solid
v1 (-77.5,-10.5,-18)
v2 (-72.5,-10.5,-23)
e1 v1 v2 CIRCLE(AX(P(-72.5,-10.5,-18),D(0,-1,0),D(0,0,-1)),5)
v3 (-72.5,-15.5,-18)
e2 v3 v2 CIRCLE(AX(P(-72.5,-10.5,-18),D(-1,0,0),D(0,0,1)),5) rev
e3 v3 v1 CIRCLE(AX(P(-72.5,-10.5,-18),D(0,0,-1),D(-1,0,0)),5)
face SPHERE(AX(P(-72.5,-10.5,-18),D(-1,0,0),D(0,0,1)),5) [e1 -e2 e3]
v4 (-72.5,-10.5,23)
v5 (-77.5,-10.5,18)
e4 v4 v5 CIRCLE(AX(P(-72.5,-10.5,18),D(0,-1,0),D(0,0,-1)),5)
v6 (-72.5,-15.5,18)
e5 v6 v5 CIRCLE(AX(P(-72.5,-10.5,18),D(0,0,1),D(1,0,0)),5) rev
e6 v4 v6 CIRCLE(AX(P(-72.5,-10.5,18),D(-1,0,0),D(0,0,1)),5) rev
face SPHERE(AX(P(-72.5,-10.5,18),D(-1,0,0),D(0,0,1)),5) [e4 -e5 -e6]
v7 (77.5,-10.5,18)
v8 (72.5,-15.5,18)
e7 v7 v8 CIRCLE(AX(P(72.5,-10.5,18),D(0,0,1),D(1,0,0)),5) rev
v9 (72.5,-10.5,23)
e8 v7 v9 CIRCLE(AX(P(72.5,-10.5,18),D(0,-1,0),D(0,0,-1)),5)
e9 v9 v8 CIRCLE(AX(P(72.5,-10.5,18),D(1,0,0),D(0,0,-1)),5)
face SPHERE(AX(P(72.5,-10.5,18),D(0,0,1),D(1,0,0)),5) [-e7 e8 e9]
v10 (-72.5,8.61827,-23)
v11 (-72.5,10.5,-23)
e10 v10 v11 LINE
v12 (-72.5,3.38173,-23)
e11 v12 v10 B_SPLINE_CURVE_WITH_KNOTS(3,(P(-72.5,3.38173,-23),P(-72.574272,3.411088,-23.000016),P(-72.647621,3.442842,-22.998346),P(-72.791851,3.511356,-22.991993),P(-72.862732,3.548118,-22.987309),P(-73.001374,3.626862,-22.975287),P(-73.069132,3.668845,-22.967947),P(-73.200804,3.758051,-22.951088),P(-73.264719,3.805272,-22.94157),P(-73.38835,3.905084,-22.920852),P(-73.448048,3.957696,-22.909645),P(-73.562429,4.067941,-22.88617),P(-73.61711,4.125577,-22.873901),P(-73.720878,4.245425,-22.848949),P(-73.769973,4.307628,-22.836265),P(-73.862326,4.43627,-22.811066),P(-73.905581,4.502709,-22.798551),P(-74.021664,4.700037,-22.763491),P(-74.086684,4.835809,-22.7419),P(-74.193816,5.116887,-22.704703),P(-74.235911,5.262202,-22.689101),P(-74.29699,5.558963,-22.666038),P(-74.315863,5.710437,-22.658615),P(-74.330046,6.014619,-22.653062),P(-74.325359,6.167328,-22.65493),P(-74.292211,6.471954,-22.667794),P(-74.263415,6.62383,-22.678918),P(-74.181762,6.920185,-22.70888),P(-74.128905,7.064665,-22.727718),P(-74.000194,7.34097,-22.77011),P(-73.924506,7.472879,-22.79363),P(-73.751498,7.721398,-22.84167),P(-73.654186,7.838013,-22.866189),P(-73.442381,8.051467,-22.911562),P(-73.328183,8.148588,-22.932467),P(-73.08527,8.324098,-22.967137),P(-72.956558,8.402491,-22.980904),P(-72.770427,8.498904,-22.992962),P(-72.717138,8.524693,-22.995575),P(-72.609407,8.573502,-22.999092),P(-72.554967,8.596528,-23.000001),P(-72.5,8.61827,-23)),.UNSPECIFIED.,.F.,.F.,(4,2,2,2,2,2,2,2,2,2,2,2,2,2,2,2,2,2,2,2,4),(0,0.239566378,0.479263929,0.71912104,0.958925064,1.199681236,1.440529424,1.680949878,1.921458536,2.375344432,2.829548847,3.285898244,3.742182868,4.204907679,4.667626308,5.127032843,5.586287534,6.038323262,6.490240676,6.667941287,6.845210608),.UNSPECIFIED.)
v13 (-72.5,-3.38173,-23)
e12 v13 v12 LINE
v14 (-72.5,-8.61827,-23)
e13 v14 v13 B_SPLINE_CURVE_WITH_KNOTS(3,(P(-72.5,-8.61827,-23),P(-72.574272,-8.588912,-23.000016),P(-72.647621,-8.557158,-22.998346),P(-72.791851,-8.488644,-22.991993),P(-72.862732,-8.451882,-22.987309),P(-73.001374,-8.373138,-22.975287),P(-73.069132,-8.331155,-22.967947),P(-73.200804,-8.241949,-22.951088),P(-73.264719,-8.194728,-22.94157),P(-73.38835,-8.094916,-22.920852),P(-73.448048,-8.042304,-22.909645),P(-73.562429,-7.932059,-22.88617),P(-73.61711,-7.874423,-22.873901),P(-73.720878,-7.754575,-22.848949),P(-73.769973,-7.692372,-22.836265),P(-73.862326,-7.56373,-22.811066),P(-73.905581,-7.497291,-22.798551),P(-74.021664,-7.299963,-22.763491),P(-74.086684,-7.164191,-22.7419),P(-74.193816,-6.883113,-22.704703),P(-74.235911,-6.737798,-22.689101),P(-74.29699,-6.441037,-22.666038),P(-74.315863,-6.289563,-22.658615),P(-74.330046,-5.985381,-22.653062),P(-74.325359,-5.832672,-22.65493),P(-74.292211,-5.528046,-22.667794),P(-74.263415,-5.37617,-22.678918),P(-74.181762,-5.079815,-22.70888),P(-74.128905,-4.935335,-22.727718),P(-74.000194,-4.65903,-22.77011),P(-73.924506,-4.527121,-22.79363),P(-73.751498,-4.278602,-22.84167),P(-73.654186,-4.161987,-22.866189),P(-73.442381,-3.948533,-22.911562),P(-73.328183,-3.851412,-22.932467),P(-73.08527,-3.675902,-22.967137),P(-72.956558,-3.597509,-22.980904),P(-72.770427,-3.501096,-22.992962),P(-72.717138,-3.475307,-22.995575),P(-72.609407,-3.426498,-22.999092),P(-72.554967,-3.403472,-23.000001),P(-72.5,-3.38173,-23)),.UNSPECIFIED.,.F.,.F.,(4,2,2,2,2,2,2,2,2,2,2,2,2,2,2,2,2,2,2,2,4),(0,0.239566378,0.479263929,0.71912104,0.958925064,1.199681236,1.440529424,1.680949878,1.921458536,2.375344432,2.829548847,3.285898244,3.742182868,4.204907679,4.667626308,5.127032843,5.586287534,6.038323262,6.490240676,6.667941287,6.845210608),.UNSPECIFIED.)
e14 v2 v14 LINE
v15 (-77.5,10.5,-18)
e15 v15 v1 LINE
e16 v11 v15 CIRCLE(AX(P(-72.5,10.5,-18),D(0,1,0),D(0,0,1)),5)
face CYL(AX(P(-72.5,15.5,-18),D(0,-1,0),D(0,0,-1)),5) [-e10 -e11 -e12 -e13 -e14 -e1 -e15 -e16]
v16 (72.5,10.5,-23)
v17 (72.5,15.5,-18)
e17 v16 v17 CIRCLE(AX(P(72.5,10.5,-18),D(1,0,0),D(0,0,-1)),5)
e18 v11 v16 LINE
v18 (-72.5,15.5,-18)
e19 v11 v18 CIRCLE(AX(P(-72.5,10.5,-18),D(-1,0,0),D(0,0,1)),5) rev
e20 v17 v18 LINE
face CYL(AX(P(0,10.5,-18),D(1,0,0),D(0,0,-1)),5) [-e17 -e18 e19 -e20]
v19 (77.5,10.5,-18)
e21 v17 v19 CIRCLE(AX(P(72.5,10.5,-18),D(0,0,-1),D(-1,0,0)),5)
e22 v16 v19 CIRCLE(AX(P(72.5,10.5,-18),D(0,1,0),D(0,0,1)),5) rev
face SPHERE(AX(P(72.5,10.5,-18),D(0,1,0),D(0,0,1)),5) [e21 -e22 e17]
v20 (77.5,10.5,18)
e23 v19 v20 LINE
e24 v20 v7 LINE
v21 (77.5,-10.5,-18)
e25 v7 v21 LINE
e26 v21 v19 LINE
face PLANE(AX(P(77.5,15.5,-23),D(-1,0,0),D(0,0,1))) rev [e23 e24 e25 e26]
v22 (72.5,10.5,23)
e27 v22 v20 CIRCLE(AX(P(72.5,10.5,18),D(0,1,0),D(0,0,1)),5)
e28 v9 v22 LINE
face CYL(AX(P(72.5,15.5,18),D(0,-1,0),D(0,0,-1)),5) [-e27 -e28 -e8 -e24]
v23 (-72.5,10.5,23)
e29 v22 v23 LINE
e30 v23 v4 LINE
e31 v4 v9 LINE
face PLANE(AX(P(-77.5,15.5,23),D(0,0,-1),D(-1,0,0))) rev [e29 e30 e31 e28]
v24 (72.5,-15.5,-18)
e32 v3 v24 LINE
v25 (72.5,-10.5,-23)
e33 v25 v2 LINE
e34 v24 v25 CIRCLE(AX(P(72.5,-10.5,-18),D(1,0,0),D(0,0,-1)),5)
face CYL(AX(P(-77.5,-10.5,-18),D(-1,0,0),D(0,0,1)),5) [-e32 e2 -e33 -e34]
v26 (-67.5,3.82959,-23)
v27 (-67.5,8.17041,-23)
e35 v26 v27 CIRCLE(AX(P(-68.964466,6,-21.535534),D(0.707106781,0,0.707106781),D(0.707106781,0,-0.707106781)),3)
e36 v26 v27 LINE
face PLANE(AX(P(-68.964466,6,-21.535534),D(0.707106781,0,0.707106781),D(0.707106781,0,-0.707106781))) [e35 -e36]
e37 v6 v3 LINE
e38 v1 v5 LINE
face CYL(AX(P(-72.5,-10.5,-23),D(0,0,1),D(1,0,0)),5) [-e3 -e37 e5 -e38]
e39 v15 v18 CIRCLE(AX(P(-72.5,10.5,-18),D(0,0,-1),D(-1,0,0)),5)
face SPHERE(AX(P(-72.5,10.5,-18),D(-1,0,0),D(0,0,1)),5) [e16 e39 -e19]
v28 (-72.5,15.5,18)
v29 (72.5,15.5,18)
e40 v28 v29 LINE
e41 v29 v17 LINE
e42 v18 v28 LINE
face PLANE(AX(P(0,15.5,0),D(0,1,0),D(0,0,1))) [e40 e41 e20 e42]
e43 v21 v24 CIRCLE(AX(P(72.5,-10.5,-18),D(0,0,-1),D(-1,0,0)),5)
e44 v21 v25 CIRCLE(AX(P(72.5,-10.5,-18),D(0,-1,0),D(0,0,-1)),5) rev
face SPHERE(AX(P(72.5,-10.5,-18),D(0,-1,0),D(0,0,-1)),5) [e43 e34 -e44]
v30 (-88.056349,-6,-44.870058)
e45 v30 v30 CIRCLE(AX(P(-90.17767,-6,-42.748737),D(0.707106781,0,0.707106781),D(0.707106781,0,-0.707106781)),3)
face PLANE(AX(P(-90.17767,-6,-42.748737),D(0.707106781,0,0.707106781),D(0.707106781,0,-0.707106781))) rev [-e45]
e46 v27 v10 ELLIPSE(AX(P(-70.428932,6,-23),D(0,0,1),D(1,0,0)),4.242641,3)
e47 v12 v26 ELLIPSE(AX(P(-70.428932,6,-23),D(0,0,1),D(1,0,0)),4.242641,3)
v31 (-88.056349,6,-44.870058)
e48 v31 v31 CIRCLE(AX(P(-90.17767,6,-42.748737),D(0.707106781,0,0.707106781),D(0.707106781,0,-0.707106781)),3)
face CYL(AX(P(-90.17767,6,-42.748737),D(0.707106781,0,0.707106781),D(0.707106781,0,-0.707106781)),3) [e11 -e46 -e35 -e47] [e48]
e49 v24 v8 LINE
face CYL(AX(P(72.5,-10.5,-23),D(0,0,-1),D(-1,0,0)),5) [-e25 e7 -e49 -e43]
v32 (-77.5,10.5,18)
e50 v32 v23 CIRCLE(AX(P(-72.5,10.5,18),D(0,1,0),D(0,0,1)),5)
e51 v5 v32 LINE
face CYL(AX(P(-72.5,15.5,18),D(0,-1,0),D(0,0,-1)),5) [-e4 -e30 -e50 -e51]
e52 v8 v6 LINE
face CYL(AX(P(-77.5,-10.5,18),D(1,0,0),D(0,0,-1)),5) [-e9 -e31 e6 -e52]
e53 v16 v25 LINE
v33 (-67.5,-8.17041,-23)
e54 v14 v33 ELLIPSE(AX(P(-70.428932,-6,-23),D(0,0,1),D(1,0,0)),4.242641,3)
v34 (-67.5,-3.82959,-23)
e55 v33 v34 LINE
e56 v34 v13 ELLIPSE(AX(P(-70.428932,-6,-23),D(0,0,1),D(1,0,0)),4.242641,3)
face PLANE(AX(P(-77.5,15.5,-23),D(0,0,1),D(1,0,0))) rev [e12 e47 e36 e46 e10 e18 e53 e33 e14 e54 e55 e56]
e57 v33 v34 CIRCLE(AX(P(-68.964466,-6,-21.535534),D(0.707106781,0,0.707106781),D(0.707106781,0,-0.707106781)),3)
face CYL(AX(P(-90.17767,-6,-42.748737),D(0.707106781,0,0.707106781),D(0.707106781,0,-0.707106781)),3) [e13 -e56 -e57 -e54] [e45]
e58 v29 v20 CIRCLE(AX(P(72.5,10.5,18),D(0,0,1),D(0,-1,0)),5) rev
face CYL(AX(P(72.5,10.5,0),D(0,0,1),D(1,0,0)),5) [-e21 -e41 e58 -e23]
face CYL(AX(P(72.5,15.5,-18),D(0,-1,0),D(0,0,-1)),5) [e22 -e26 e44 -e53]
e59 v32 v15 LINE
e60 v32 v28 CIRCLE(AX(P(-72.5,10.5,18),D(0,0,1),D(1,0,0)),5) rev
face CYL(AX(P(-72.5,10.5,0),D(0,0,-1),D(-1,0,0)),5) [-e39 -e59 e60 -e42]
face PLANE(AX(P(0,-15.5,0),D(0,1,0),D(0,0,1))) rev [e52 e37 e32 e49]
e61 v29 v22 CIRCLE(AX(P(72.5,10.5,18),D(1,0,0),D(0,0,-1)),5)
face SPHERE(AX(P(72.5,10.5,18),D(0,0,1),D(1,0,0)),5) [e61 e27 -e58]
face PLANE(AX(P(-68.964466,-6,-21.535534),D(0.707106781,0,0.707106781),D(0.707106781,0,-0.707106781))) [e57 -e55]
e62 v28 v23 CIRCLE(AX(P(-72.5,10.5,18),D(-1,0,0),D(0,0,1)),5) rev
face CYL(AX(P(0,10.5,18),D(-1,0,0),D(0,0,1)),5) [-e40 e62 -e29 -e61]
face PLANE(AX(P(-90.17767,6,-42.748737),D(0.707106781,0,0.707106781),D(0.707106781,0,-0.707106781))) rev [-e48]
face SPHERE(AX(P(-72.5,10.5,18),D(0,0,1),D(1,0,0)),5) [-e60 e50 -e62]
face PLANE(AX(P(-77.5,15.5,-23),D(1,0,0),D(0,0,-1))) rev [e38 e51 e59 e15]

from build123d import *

# Parameters (mm, degrees)
SKETCH1_W           = 155
SKETCH1_H           = 46
BOSS_EXTRUDE1_DEPTH = 15.5
SKETCH4_R           = 3
BOSS_EXTRUDE2_DEPTH = 30
FILLET1_R           = 5


with BuildPart() as part:
    # Sketch1 → Boss-Extrude1 (new, symmetric)
    with BuildSketch(Plane(origin=(0, 0, 0), x_dir=(1, 0, 0), z_dir=(0, 1, 0))):
        Rectangle(SKETCH1_W, SKETCH1_H)
    extrude(amount=BOSS_EXTRUDE1_DEPTH, both=True)

    # Sketch4 → Boss-Extrude2 (add)
    with BuildSketch(Plane(origin=(-45.25, 0, -45.25), x_dir=(0.7071067811865509, 0, -0.7071067811865442), z_dir=(0.7071067811865442, 0, 0.7071067811865509))):
        with Locations((-33.537319575, 6)):
            Circle(SKETCH4_R)
        with Locations((-33.537319575, -6)):
            Circle(SKETCH4_R)
    extrude(amount=-BOSS_EXTRUDE2_DEPTH)

    # Fillet1
    # the kernel refuses this fillet: 5 mm, written as the material it takes off along each edge
    with BuildSketch(Plane(origin=(-72.5, 10.5, 18), x_dir=(0, 1, 0), z_dir=(-1, 0, 0))) as fillet1_piece_1_section:
        Polygon((0, 0), (FILLET1_R, 0), (FILLET1_R, -FILLET1_R), (0, -FILLET1_R), align=None)
    fillet1_piece_1 = extrude(amount=FILLET1_R, mode=Mode.PRIVATE)
    fillet1_piece_1 = fillet1_piece_1 - Plane(origin=(-72.5, 10.5, 18), x_dir=(0, -0.7071067811865475, -0.7071067811865475), z_dir=(-1, 0, 0)) * Sphere(FILLET1_R, mode=Mode.PRIVATE)
    add(fillet1_piece_1, mode=Mode.SUBTRACT)
    with BuildSketch(Plane(origin=(-72.5, 10.5, -18), x_dir=(-1, 0, 0), z_dir=(0, 0, -1))) as fillet1_piece_2_section:
        Polygon((0, 0), (FILLET1_R, 0), (FILLET1_R, FILLET1_R), (0, FILLET1_R), align=None)
    fillet1_piece_2 = extrude(amount=FILLET1_R, mode=Mode.PRIVATE)
    fillet1_piece_2 = fillet1_piece_2 - Plane(origin=(-72.5, 10.5, -18), x_dir=(0.7071067811865475, -0.7071067811865475, 0), z_dir=(0, 0, -1)) * Sphere(FILLET1_R, mode=Mode.PRIVATE)
    add(fillet1_piece_2, mode=Mode.SUBTRACT)
    with BuildSketch(Plane(origin=(72.5, 10.5, 18), x_dir=(0, 1, 0), z_dir=(0, 0, 1))) as fillet1_piece_3_section:
        Polygon((0, 0), (FILLET1_R, 0), (FILLET1_R, -FILLET1_R), (0, -FILLET1_R), align=None)
    fillet1_piece_3 = extrude(amount=FILLET1_R, mode=Mode.PRIVATE)
    fillet1_piece_3 = fillet1_piece_3 - Plane(origin=(72.5, 10.5, 18), x_dir=(-0.7071067811865475, -0.7071067811865475, 0), z_dir=(0, 0, 1)) * Sphere(FILLET1_R, mode=Mode.PRIVATE)
    add(fillet1_piece_3, mode=Mode.SUBTRACT)
    with BuildSketch(Plane(origin=(72.5, 10.5, -18), x_dir=(0, 1, 0), z_dir=(0, 0, -1))) as fillet1_piece_4_section:
        Polygon((0, 0), (FILLET1_R, 0), (FILLET1_R, FILLET1_R), (0, FILLET1_R), align=None)
    fillet1_piece_4 = extrude(amount=FILLET1_R, mode=Mode.PRIVATE)
    fillet1_piece_4 = fillet1_piece_4 - Plane(origin=(72.5, 10.5, -18), x_dir=(-0.7071067811865475, -0.7071067811865475, 0), z_dir=(0, 0, -1)) * Sphere(FILLET1_R, mode=Mode.PRIVATE)
    add(fillet1_piece_4, mode=Mode.SUBTRACT)
    with BuildSketch(Plane(origin=(72.5, -10.5, 18), x_dir=(0, -1, 0), z_dir=(0, 0, 1))) as fillet1_piece_5_section:
        Polygon((0, 0), (FILLET1_R, 0), (FILLET1_R, FILLET1_R), (0, FILLET1_R), align=None)
    fillet1_piece_5 = extrude(amount=FILLET1_R, mode=Mode.PRIVATE)
    fillet1_piece_5 = fillet1_piece_5 - Plane(origin=(72.5, -10.5, 18), x_dir=(-0.7071067811865475, 0.7071067811865475, 0), z_dir=(0, 0, 1)) * Sphere(FILLET1_R, mode=Mode.PRIVATE)
    add(fillet1_piece_5, mode=Mode.SUBTRACT)
    with BuildSketch(Plane(origin=(-72.5, -10.5, 18), x_dir=(0, -1, 0), z_dir=(0, 0, 1))) as fillet1_piece_6_section:
        Polygon((0, 0), (FILLET1_R, 0), (FILLET1_R, -FILLET1_R), (0, -FILLET1_R), align=None)
    fillet1_piece_6 = extrude(amount=FILLET1_R, mode=Mode.PRIVATE)
    fillet1_piece_6 = fillet1_piece_6 - Plane(origin=(-72.5, -10.5, 18), x_dir=(0.7071067811865475, 0.7071067811865475, 0), z_dir=(0, 0, 1)) * Sphere(FILLET1_R, mode=Mode.PRIVATE)
    add(fillet1_piece_6, mode=Mode.SUBTRACT)
    with BuildSketch(Plane(origin=(-72.5, -10.5, -18), x_dir=(-1, 0, 0), z_dir=(0, 0, -1))) as fillet1_piece_7_section:
        Polygon((0, 0), (FILLET1_R, 0), (FILLET1_R, -FILLET1_R), (0, -FILLET1_R), align=None)
    fillet1_piece_7 = extrude(amount=FILLET1_R, mode=Mode.PRIVATE)
    fillet1_piece_7 = fillet1_piece_7 - Plane(origin=(-72.5, -10.5, -18), x_dir=(0.7071067811865475, 0.7071067811865475, 0), z_dir=(0, 0, -1)) * Sphere(FILLET1_R, mode=Mode.PRIVATE)
    add(fillet1_piece_7, mode=Mode.SUBTRACT)
    with BuildSketch(Plane(origin=(72.5, -10.5, -18), x_dir=(0, -1, 0), z_dir=(0, 0, -1))) as fillet1_piece_8_section:
        Polygon((0, 0), (FILLET1_R, 0), (FILLET1_R, -FILLET1_R), (0, -FILLET1_R), align=None)
    fillet1_piece_8 = extrude(amount=FILLET1_R, mode=Mode.PRIVATE)
    fillet1_piece_8 = fillet1_piece_8 - Plane(origin=(72.5, -10.5, -18), x_dir=(-0.7071067811865475, 0.7071067811865475, 0), z_dir=(0, 0, -1)) * Sphere(FILLET1_R, mode=Mode.PRIVATE)
    add(fillet1_piece_8, mode=Mode.SUBTRACT)
    with BuildSketch(Plane(origin=(-77.5, 15.5, 18), x_dir=(0, -1, 0), z_dir=(0, 0, -1)), Plane(origin=(77.5, -15.5, -18), x_dir=(-1, 0, 0), z_dir=(0, 0, 1))) as fillet1_piece_9:
        with BuildLine():
            CenterArc((FILLET1_R, -FILLET1_R), FILLET1_R, 90, 90)
            Line((0, -FILLET1_R), (0, 0))
            Line((0, 0), (FILLET1_R, 0))
        make_face()
    extrude(amount=36, mode=Mode.SUBTRACT)
    with BuildSketch(Plane(origin=(72.5, 15.5, 23), x_dir=(0, 0, -1), z_dir=(-1, 0, 0)), Plane(origin=(-72.5, -15.5, -23), x_dir=(0, 1, 0), z_dir=(1, 0, 0))) as fillet1_piece_10:
        with BuildLine():
            CenterArc((FILLET1_R, FILLET1_R), FILLET1_R, 180, 90)
            Line((0, FILLET1_R), (0, 0))
            Line((0, 0), (FILLET1_R, 0))
        make_face()
    extrude(amount=145, mode=Mode.SUBTRACT)
    with BuildSketch(Plane(origin=(77.5, 15.5, -18), x_dir=(-1, 0, 0), z_dir=(0, 0, 1)), Plane(origin=(-77.5, -15.5, 18), x_dir=(0, 1, 0), z_dir=(0, 0, -1))) as fillet1_piece_11:
        with BuildLine():
            CenterArc((FILLET1_R, FILLET1_R), FILLET1_R, 180, 90)
            Line((0, FILLET1_R), (0, 0))
            Line((0, 0), (FILLET1_R, 0))
        make_face()
    extrude(amount=36, mode=Mode.SUBTRACT)
    with BuildSketch(Plane(origin=(72.5, -15.5, 23), x_dir=(0, 0, -1), z_dir=(-1, 0, 0)), Plane(origin=(-72.5, 15.5, -23), x_dir=(0, -1, 0), z_dir=(1, 0, 0))) as fillet1_piece_12:
        with BuildLine():
            CenterArc((FILLET1_R, -FILLET1_R), FILLET1_R, 90, 90)
            Line((0, -FILLET1_R), (0, 0))
            Line((0, 0), (FILLET1_R, 0))
        make_face()
    extrude(amount=145, mode=Mode.SUBTRACT)
    with BuildSketch(Plane(origin=(77.5, 10.5, 23), x_dir=(0, 0, -1), z_dir=(0, -1, 0)), Plane(origin=(-77.5, -10.5, 23), x_dir=(0, 0, -1), z_dir=(0, 1, 0)), Plane(origin=(77.5, 10.5, -23), x_dir=(-1, 0, 0), z_dir=(0, -1, 0))) as fillet1_piece_13:
        with BuildLine():
            CenterArc((FILLET1_R, -FILLET1_R), FILLET1_R, 90, 90)
            Line((0, -FILLET1_R), (0, 0))
            Line((0, 0), (FILLET1_R, 0))
        make_face()
    extrude(amount=21, mode=Mode.SUBTRACT)
    with BuildSketch(Plane(origin=(-77.5, -10.5, -23), x_dir=(1, 0, 0), z_dir=(0, 1, 0))) as fillet1_piece_14_section:
        with BuildLine():
            CenterArc((FILLET1_R, -FILLET1_R), FILLET1_R, 90, 90)
            Line((0, -FILLET1_R), (0, 0))
            Line((0, 0), (FILLET1_R, 0))
        make_face()
    fillet1_piece_14 = extrude(amount=21, mode=Mode.PRIVATE)
    fillet1_piece_14 = fillet1_piece_14 - Plane(origin=(-72.851968895, -6, -25.423036706), x_dir=(0.7071067811865509, 0, -0.7071067811865442), z_dir=(0.7071067811865442, 0, 0.7071067811865509)) * Cylinder(3, 62, mode=Mode.PRIVATE)
    fillet1_piece_14 = fillet1_piece_14 - Plane(origin=(-72.851968895, 6, -25.423036706), x_dir=(0.7071067811865509, 0, -0.7071067811865442), z_dir=(0.7071067811865442, 0, 0.7071067811865509)) * Cylinder(3, 62, mode=Mode.PRIVATE)
    add(fillet1_piece_14, mode=Mode.SUBTRACT)


solid = part.part
